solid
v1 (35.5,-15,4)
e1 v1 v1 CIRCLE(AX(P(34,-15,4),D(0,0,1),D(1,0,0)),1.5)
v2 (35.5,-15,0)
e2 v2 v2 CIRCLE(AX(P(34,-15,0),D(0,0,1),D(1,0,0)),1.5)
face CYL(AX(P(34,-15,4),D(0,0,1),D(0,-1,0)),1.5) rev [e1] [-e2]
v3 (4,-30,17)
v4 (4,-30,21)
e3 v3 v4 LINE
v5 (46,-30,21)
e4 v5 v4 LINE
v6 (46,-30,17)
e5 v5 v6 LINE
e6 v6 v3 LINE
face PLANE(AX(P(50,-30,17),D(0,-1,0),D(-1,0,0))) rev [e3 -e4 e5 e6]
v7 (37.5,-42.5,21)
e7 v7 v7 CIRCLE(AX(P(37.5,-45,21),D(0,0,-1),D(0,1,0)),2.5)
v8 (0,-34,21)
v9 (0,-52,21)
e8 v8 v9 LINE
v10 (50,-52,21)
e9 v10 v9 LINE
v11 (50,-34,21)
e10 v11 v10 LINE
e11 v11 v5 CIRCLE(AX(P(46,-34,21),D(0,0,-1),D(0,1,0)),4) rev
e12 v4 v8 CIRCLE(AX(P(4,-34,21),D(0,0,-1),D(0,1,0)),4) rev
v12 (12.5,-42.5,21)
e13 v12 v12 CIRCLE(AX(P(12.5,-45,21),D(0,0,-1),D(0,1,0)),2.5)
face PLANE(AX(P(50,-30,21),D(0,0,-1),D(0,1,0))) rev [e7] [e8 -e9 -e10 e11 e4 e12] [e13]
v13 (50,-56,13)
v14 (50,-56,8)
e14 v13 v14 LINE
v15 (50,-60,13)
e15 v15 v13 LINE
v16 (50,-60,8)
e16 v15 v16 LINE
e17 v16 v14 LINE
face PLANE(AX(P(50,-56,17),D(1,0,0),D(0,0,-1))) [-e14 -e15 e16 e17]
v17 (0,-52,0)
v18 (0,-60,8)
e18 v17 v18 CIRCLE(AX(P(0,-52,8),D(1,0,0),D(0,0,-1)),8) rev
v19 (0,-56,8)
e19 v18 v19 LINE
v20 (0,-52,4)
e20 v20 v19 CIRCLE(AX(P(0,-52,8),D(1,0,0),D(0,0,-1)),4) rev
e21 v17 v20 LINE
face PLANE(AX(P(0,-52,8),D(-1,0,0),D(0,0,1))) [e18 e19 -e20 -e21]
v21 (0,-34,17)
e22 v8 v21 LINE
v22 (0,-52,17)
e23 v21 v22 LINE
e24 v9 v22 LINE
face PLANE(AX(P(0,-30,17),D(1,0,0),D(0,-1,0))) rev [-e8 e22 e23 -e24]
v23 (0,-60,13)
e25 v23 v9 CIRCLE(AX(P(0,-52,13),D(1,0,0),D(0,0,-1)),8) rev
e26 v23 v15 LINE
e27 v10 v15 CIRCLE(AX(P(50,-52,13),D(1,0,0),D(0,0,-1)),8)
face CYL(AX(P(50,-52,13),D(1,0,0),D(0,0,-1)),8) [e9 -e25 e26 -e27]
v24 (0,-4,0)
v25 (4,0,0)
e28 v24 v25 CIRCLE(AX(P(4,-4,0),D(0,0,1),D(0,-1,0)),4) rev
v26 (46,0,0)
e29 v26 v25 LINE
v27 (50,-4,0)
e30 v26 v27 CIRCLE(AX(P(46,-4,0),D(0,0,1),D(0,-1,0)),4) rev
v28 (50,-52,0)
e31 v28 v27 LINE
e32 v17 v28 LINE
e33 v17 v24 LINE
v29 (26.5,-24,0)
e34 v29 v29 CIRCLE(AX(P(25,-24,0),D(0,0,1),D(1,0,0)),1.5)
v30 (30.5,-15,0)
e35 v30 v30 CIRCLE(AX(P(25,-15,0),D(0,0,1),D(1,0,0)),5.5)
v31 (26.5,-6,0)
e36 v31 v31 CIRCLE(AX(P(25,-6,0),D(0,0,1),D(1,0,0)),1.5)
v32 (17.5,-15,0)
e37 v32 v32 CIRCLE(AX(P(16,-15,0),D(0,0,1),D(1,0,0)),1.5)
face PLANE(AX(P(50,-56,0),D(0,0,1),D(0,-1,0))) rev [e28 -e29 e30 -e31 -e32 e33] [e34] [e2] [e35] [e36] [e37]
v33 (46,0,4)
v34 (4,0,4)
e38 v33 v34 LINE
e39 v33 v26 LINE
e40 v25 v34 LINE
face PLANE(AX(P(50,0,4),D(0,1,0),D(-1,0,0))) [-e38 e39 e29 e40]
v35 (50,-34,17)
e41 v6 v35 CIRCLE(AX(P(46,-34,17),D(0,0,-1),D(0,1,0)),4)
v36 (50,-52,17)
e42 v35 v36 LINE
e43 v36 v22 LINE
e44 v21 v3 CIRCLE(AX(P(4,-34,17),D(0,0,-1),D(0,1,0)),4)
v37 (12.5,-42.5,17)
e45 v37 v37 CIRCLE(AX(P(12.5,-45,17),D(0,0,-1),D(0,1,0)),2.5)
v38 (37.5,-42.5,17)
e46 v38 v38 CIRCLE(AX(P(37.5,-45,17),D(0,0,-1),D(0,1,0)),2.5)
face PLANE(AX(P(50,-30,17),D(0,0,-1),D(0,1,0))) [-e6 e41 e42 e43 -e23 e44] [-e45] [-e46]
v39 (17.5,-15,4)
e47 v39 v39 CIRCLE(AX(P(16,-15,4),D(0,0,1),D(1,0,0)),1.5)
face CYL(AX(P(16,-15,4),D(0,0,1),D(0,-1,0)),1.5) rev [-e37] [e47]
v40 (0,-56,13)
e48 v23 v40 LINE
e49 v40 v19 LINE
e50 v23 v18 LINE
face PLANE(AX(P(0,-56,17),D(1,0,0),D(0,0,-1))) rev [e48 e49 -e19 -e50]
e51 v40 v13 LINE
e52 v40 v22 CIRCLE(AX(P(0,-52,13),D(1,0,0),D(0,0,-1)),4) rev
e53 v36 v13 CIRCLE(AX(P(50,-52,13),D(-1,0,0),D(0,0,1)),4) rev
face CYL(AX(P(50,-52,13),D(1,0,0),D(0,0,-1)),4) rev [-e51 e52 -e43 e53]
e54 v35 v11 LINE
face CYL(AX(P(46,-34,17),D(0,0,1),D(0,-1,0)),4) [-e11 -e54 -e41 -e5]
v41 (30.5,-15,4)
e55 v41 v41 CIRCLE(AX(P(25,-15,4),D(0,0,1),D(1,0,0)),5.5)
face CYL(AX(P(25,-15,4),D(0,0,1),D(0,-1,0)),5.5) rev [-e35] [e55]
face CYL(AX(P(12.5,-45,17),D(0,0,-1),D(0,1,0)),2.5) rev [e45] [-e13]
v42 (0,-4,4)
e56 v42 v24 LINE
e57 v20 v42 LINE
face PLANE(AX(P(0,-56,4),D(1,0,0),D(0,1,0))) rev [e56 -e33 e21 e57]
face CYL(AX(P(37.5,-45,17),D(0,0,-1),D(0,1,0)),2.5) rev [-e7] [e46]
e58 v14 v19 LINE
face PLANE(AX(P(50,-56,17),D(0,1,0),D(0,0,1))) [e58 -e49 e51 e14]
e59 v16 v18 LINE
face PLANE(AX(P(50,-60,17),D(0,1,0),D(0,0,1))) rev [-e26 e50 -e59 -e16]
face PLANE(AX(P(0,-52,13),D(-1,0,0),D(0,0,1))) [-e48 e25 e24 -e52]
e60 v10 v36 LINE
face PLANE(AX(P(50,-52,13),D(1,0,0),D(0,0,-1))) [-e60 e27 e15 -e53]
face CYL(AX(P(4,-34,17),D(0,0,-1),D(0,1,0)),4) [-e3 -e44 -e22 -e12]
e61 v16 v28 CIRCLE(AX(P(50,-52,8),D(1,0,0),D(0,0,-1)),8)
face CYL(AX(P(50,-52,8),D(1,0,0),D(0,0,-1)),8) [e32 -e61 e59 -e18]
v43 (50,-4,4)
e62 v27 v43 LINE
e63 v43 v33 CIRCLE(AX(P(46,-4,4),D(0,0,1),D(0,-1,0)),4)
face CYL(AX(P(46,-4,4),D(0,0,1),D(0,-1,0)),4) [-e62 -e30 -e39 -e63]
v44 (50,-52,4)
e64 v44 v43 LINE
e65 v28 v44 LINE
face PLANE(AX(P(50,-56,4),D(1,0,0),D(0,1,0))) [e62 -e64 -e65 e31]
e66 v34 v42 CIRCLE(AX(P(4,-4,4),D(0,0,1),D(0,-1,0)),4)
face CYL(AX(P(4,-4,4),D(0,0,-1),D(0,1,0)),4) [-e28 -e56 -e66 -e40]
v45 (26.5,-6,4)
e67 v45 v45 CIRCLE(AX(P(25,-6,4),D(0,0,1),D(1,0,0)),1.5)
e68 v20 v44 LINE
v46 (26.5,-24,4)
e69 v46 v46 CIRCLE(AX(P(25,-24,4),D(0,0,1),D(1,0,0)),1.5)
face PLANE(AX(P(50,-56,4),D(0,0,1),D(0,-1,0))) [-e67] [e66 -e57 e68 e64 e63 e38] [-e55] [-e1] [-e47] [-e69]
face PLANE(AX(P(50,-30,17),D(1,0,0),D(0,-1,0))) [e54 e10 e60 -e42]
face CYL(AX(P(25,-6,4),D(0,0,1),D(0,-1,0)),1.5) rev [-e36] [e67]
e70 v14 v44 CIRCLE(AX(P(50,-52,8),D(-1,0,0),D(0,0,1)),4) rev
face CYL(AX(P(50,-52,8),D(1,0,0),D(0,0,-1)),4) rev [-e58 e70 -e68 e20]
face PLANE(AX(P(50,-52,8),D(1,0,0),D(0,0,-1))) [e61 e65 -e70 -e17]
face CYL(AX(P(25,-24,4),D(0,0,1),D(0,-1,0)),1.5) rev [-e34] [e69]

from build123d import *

# Parameters (mm, degrees)
BOSS_EXTRUDE1_DEPTH    = 50
SKETCH2_R              = 5.5
SKETCH2_R_2            = 1.5
CUT_EXTRUDE1_DEPTH     = 50
SKETCH3_R              = 2.5
CUT_EXTRUDE3_DEPTH     = 10
CONVERT_SOLID1_DEPTH   = 50
CONVERT_SOLID1_2_DEPTH = 50
FILLET1_R              = 4


# Read off the part's stored shape, not the designer's step: Convert-Solid1
with BuildPart() as part:
    # Sketch1 → Boss-Extrude1 (new body)
    with BuildSketch(Plane(origin=(0, 0, 0), x_dir=(0, 0, -1), z_dir=(1, 0, 0))):
        Polygon((0, 0), (0, -60), (-21, -60), (-21, -30), (-17, -30), (-17, -56), (-4, -56), (-4, 0), align=None)
    extrude(amount=BOSS_EXTRUDE1_DEPTH)

    # Sketch2 → Cut-Extrude1 (cut)
    with BuildSketch(Plane.XY.offset(4)):
        with Locations((25, -15)):
            Circle(SKETCH2_R)
        with Locations((25, -6)):
            Circle(SKETCH2_R_2)
        with Locations((16, -15)):
            Circle(SKETCH2_R_2)
        with Locations((25, -24)):
            Circle(SKETCH2_R_2)
        with Locations((34, -15)):
            Circle(SKETCH2_R_2)
    extrude(amount=-CUT_EXTRUDE1_DEPTH, mode=Mode.SUBTRACT)

    # Sketch3 → Cut-Extrude3 (cut)
    with BuildSketch(Plane.XY.offset(21)):
        with Locations((12.5, -45)):
            Circle(SKETCH3_R)
        with Locations((37.5, -45)):
            Circle(SKETCH3_R)
    extrude(amount=-CUT_EXTRUDE3_DEPTH, mode=Mode.SUBTRACT)

    # Convert-Solid1 outline → Convert-Solid1 (cut)
    with BuildSketch(Plane.YZ):
        with BuildLine():
            Line((-60, 21), (-60, 13))
            ThreePointArc((-60, 13), (-57.656854249, 18.656854249), (-52, 21))
            Line((-52, 21), (-60, 21))
        make_face()
        with BuildLine():
            ThreePointArc((-52, 0), (-57.656854249, 2.343145751), (-60, 8))
            Line((-60, 8), (-60, 0))
            Line((-60, 0), (-52, 0))
        make_face()
    extrude(amount=CONVERT_SOLID1_DEPTH, mode=Mode.SUBTRACT)

    # Convert-Solid1 2 outline → Convert-Solid1 2 (add)
    with BuildSketch(Plane.YZ):
        with BuildLine():
            ThreePointArc((-52, 4), (-54.828427125, 5.171572875), (-56, 8))
            Line((-56, 8), (-56, 4))
            Line((-56, 4), (-52, 4))
        make_face()
        with BuildLine():
            Line((-56, 17), (-56, 13))
            ThreePointArc((-56, 13), (-54.828427125, 15.828427125), (-52, 17))
            Line((-52, 17), (-56, 17))
        make_face()
    extrude(amount=CONVERT_SOLID1_2_DEPTH)

    # Fillet1
    fillet1_edges = [part.edges().sort_by_distance(p)[0] for p in [
        (50, -30, 19),
        (0, -30, 19),
        (0, 0, 2),
        (50, 0, 2),
    ]]
    fillet(fillet1_edges, radius=FILLET1_R)


solid = part.part
